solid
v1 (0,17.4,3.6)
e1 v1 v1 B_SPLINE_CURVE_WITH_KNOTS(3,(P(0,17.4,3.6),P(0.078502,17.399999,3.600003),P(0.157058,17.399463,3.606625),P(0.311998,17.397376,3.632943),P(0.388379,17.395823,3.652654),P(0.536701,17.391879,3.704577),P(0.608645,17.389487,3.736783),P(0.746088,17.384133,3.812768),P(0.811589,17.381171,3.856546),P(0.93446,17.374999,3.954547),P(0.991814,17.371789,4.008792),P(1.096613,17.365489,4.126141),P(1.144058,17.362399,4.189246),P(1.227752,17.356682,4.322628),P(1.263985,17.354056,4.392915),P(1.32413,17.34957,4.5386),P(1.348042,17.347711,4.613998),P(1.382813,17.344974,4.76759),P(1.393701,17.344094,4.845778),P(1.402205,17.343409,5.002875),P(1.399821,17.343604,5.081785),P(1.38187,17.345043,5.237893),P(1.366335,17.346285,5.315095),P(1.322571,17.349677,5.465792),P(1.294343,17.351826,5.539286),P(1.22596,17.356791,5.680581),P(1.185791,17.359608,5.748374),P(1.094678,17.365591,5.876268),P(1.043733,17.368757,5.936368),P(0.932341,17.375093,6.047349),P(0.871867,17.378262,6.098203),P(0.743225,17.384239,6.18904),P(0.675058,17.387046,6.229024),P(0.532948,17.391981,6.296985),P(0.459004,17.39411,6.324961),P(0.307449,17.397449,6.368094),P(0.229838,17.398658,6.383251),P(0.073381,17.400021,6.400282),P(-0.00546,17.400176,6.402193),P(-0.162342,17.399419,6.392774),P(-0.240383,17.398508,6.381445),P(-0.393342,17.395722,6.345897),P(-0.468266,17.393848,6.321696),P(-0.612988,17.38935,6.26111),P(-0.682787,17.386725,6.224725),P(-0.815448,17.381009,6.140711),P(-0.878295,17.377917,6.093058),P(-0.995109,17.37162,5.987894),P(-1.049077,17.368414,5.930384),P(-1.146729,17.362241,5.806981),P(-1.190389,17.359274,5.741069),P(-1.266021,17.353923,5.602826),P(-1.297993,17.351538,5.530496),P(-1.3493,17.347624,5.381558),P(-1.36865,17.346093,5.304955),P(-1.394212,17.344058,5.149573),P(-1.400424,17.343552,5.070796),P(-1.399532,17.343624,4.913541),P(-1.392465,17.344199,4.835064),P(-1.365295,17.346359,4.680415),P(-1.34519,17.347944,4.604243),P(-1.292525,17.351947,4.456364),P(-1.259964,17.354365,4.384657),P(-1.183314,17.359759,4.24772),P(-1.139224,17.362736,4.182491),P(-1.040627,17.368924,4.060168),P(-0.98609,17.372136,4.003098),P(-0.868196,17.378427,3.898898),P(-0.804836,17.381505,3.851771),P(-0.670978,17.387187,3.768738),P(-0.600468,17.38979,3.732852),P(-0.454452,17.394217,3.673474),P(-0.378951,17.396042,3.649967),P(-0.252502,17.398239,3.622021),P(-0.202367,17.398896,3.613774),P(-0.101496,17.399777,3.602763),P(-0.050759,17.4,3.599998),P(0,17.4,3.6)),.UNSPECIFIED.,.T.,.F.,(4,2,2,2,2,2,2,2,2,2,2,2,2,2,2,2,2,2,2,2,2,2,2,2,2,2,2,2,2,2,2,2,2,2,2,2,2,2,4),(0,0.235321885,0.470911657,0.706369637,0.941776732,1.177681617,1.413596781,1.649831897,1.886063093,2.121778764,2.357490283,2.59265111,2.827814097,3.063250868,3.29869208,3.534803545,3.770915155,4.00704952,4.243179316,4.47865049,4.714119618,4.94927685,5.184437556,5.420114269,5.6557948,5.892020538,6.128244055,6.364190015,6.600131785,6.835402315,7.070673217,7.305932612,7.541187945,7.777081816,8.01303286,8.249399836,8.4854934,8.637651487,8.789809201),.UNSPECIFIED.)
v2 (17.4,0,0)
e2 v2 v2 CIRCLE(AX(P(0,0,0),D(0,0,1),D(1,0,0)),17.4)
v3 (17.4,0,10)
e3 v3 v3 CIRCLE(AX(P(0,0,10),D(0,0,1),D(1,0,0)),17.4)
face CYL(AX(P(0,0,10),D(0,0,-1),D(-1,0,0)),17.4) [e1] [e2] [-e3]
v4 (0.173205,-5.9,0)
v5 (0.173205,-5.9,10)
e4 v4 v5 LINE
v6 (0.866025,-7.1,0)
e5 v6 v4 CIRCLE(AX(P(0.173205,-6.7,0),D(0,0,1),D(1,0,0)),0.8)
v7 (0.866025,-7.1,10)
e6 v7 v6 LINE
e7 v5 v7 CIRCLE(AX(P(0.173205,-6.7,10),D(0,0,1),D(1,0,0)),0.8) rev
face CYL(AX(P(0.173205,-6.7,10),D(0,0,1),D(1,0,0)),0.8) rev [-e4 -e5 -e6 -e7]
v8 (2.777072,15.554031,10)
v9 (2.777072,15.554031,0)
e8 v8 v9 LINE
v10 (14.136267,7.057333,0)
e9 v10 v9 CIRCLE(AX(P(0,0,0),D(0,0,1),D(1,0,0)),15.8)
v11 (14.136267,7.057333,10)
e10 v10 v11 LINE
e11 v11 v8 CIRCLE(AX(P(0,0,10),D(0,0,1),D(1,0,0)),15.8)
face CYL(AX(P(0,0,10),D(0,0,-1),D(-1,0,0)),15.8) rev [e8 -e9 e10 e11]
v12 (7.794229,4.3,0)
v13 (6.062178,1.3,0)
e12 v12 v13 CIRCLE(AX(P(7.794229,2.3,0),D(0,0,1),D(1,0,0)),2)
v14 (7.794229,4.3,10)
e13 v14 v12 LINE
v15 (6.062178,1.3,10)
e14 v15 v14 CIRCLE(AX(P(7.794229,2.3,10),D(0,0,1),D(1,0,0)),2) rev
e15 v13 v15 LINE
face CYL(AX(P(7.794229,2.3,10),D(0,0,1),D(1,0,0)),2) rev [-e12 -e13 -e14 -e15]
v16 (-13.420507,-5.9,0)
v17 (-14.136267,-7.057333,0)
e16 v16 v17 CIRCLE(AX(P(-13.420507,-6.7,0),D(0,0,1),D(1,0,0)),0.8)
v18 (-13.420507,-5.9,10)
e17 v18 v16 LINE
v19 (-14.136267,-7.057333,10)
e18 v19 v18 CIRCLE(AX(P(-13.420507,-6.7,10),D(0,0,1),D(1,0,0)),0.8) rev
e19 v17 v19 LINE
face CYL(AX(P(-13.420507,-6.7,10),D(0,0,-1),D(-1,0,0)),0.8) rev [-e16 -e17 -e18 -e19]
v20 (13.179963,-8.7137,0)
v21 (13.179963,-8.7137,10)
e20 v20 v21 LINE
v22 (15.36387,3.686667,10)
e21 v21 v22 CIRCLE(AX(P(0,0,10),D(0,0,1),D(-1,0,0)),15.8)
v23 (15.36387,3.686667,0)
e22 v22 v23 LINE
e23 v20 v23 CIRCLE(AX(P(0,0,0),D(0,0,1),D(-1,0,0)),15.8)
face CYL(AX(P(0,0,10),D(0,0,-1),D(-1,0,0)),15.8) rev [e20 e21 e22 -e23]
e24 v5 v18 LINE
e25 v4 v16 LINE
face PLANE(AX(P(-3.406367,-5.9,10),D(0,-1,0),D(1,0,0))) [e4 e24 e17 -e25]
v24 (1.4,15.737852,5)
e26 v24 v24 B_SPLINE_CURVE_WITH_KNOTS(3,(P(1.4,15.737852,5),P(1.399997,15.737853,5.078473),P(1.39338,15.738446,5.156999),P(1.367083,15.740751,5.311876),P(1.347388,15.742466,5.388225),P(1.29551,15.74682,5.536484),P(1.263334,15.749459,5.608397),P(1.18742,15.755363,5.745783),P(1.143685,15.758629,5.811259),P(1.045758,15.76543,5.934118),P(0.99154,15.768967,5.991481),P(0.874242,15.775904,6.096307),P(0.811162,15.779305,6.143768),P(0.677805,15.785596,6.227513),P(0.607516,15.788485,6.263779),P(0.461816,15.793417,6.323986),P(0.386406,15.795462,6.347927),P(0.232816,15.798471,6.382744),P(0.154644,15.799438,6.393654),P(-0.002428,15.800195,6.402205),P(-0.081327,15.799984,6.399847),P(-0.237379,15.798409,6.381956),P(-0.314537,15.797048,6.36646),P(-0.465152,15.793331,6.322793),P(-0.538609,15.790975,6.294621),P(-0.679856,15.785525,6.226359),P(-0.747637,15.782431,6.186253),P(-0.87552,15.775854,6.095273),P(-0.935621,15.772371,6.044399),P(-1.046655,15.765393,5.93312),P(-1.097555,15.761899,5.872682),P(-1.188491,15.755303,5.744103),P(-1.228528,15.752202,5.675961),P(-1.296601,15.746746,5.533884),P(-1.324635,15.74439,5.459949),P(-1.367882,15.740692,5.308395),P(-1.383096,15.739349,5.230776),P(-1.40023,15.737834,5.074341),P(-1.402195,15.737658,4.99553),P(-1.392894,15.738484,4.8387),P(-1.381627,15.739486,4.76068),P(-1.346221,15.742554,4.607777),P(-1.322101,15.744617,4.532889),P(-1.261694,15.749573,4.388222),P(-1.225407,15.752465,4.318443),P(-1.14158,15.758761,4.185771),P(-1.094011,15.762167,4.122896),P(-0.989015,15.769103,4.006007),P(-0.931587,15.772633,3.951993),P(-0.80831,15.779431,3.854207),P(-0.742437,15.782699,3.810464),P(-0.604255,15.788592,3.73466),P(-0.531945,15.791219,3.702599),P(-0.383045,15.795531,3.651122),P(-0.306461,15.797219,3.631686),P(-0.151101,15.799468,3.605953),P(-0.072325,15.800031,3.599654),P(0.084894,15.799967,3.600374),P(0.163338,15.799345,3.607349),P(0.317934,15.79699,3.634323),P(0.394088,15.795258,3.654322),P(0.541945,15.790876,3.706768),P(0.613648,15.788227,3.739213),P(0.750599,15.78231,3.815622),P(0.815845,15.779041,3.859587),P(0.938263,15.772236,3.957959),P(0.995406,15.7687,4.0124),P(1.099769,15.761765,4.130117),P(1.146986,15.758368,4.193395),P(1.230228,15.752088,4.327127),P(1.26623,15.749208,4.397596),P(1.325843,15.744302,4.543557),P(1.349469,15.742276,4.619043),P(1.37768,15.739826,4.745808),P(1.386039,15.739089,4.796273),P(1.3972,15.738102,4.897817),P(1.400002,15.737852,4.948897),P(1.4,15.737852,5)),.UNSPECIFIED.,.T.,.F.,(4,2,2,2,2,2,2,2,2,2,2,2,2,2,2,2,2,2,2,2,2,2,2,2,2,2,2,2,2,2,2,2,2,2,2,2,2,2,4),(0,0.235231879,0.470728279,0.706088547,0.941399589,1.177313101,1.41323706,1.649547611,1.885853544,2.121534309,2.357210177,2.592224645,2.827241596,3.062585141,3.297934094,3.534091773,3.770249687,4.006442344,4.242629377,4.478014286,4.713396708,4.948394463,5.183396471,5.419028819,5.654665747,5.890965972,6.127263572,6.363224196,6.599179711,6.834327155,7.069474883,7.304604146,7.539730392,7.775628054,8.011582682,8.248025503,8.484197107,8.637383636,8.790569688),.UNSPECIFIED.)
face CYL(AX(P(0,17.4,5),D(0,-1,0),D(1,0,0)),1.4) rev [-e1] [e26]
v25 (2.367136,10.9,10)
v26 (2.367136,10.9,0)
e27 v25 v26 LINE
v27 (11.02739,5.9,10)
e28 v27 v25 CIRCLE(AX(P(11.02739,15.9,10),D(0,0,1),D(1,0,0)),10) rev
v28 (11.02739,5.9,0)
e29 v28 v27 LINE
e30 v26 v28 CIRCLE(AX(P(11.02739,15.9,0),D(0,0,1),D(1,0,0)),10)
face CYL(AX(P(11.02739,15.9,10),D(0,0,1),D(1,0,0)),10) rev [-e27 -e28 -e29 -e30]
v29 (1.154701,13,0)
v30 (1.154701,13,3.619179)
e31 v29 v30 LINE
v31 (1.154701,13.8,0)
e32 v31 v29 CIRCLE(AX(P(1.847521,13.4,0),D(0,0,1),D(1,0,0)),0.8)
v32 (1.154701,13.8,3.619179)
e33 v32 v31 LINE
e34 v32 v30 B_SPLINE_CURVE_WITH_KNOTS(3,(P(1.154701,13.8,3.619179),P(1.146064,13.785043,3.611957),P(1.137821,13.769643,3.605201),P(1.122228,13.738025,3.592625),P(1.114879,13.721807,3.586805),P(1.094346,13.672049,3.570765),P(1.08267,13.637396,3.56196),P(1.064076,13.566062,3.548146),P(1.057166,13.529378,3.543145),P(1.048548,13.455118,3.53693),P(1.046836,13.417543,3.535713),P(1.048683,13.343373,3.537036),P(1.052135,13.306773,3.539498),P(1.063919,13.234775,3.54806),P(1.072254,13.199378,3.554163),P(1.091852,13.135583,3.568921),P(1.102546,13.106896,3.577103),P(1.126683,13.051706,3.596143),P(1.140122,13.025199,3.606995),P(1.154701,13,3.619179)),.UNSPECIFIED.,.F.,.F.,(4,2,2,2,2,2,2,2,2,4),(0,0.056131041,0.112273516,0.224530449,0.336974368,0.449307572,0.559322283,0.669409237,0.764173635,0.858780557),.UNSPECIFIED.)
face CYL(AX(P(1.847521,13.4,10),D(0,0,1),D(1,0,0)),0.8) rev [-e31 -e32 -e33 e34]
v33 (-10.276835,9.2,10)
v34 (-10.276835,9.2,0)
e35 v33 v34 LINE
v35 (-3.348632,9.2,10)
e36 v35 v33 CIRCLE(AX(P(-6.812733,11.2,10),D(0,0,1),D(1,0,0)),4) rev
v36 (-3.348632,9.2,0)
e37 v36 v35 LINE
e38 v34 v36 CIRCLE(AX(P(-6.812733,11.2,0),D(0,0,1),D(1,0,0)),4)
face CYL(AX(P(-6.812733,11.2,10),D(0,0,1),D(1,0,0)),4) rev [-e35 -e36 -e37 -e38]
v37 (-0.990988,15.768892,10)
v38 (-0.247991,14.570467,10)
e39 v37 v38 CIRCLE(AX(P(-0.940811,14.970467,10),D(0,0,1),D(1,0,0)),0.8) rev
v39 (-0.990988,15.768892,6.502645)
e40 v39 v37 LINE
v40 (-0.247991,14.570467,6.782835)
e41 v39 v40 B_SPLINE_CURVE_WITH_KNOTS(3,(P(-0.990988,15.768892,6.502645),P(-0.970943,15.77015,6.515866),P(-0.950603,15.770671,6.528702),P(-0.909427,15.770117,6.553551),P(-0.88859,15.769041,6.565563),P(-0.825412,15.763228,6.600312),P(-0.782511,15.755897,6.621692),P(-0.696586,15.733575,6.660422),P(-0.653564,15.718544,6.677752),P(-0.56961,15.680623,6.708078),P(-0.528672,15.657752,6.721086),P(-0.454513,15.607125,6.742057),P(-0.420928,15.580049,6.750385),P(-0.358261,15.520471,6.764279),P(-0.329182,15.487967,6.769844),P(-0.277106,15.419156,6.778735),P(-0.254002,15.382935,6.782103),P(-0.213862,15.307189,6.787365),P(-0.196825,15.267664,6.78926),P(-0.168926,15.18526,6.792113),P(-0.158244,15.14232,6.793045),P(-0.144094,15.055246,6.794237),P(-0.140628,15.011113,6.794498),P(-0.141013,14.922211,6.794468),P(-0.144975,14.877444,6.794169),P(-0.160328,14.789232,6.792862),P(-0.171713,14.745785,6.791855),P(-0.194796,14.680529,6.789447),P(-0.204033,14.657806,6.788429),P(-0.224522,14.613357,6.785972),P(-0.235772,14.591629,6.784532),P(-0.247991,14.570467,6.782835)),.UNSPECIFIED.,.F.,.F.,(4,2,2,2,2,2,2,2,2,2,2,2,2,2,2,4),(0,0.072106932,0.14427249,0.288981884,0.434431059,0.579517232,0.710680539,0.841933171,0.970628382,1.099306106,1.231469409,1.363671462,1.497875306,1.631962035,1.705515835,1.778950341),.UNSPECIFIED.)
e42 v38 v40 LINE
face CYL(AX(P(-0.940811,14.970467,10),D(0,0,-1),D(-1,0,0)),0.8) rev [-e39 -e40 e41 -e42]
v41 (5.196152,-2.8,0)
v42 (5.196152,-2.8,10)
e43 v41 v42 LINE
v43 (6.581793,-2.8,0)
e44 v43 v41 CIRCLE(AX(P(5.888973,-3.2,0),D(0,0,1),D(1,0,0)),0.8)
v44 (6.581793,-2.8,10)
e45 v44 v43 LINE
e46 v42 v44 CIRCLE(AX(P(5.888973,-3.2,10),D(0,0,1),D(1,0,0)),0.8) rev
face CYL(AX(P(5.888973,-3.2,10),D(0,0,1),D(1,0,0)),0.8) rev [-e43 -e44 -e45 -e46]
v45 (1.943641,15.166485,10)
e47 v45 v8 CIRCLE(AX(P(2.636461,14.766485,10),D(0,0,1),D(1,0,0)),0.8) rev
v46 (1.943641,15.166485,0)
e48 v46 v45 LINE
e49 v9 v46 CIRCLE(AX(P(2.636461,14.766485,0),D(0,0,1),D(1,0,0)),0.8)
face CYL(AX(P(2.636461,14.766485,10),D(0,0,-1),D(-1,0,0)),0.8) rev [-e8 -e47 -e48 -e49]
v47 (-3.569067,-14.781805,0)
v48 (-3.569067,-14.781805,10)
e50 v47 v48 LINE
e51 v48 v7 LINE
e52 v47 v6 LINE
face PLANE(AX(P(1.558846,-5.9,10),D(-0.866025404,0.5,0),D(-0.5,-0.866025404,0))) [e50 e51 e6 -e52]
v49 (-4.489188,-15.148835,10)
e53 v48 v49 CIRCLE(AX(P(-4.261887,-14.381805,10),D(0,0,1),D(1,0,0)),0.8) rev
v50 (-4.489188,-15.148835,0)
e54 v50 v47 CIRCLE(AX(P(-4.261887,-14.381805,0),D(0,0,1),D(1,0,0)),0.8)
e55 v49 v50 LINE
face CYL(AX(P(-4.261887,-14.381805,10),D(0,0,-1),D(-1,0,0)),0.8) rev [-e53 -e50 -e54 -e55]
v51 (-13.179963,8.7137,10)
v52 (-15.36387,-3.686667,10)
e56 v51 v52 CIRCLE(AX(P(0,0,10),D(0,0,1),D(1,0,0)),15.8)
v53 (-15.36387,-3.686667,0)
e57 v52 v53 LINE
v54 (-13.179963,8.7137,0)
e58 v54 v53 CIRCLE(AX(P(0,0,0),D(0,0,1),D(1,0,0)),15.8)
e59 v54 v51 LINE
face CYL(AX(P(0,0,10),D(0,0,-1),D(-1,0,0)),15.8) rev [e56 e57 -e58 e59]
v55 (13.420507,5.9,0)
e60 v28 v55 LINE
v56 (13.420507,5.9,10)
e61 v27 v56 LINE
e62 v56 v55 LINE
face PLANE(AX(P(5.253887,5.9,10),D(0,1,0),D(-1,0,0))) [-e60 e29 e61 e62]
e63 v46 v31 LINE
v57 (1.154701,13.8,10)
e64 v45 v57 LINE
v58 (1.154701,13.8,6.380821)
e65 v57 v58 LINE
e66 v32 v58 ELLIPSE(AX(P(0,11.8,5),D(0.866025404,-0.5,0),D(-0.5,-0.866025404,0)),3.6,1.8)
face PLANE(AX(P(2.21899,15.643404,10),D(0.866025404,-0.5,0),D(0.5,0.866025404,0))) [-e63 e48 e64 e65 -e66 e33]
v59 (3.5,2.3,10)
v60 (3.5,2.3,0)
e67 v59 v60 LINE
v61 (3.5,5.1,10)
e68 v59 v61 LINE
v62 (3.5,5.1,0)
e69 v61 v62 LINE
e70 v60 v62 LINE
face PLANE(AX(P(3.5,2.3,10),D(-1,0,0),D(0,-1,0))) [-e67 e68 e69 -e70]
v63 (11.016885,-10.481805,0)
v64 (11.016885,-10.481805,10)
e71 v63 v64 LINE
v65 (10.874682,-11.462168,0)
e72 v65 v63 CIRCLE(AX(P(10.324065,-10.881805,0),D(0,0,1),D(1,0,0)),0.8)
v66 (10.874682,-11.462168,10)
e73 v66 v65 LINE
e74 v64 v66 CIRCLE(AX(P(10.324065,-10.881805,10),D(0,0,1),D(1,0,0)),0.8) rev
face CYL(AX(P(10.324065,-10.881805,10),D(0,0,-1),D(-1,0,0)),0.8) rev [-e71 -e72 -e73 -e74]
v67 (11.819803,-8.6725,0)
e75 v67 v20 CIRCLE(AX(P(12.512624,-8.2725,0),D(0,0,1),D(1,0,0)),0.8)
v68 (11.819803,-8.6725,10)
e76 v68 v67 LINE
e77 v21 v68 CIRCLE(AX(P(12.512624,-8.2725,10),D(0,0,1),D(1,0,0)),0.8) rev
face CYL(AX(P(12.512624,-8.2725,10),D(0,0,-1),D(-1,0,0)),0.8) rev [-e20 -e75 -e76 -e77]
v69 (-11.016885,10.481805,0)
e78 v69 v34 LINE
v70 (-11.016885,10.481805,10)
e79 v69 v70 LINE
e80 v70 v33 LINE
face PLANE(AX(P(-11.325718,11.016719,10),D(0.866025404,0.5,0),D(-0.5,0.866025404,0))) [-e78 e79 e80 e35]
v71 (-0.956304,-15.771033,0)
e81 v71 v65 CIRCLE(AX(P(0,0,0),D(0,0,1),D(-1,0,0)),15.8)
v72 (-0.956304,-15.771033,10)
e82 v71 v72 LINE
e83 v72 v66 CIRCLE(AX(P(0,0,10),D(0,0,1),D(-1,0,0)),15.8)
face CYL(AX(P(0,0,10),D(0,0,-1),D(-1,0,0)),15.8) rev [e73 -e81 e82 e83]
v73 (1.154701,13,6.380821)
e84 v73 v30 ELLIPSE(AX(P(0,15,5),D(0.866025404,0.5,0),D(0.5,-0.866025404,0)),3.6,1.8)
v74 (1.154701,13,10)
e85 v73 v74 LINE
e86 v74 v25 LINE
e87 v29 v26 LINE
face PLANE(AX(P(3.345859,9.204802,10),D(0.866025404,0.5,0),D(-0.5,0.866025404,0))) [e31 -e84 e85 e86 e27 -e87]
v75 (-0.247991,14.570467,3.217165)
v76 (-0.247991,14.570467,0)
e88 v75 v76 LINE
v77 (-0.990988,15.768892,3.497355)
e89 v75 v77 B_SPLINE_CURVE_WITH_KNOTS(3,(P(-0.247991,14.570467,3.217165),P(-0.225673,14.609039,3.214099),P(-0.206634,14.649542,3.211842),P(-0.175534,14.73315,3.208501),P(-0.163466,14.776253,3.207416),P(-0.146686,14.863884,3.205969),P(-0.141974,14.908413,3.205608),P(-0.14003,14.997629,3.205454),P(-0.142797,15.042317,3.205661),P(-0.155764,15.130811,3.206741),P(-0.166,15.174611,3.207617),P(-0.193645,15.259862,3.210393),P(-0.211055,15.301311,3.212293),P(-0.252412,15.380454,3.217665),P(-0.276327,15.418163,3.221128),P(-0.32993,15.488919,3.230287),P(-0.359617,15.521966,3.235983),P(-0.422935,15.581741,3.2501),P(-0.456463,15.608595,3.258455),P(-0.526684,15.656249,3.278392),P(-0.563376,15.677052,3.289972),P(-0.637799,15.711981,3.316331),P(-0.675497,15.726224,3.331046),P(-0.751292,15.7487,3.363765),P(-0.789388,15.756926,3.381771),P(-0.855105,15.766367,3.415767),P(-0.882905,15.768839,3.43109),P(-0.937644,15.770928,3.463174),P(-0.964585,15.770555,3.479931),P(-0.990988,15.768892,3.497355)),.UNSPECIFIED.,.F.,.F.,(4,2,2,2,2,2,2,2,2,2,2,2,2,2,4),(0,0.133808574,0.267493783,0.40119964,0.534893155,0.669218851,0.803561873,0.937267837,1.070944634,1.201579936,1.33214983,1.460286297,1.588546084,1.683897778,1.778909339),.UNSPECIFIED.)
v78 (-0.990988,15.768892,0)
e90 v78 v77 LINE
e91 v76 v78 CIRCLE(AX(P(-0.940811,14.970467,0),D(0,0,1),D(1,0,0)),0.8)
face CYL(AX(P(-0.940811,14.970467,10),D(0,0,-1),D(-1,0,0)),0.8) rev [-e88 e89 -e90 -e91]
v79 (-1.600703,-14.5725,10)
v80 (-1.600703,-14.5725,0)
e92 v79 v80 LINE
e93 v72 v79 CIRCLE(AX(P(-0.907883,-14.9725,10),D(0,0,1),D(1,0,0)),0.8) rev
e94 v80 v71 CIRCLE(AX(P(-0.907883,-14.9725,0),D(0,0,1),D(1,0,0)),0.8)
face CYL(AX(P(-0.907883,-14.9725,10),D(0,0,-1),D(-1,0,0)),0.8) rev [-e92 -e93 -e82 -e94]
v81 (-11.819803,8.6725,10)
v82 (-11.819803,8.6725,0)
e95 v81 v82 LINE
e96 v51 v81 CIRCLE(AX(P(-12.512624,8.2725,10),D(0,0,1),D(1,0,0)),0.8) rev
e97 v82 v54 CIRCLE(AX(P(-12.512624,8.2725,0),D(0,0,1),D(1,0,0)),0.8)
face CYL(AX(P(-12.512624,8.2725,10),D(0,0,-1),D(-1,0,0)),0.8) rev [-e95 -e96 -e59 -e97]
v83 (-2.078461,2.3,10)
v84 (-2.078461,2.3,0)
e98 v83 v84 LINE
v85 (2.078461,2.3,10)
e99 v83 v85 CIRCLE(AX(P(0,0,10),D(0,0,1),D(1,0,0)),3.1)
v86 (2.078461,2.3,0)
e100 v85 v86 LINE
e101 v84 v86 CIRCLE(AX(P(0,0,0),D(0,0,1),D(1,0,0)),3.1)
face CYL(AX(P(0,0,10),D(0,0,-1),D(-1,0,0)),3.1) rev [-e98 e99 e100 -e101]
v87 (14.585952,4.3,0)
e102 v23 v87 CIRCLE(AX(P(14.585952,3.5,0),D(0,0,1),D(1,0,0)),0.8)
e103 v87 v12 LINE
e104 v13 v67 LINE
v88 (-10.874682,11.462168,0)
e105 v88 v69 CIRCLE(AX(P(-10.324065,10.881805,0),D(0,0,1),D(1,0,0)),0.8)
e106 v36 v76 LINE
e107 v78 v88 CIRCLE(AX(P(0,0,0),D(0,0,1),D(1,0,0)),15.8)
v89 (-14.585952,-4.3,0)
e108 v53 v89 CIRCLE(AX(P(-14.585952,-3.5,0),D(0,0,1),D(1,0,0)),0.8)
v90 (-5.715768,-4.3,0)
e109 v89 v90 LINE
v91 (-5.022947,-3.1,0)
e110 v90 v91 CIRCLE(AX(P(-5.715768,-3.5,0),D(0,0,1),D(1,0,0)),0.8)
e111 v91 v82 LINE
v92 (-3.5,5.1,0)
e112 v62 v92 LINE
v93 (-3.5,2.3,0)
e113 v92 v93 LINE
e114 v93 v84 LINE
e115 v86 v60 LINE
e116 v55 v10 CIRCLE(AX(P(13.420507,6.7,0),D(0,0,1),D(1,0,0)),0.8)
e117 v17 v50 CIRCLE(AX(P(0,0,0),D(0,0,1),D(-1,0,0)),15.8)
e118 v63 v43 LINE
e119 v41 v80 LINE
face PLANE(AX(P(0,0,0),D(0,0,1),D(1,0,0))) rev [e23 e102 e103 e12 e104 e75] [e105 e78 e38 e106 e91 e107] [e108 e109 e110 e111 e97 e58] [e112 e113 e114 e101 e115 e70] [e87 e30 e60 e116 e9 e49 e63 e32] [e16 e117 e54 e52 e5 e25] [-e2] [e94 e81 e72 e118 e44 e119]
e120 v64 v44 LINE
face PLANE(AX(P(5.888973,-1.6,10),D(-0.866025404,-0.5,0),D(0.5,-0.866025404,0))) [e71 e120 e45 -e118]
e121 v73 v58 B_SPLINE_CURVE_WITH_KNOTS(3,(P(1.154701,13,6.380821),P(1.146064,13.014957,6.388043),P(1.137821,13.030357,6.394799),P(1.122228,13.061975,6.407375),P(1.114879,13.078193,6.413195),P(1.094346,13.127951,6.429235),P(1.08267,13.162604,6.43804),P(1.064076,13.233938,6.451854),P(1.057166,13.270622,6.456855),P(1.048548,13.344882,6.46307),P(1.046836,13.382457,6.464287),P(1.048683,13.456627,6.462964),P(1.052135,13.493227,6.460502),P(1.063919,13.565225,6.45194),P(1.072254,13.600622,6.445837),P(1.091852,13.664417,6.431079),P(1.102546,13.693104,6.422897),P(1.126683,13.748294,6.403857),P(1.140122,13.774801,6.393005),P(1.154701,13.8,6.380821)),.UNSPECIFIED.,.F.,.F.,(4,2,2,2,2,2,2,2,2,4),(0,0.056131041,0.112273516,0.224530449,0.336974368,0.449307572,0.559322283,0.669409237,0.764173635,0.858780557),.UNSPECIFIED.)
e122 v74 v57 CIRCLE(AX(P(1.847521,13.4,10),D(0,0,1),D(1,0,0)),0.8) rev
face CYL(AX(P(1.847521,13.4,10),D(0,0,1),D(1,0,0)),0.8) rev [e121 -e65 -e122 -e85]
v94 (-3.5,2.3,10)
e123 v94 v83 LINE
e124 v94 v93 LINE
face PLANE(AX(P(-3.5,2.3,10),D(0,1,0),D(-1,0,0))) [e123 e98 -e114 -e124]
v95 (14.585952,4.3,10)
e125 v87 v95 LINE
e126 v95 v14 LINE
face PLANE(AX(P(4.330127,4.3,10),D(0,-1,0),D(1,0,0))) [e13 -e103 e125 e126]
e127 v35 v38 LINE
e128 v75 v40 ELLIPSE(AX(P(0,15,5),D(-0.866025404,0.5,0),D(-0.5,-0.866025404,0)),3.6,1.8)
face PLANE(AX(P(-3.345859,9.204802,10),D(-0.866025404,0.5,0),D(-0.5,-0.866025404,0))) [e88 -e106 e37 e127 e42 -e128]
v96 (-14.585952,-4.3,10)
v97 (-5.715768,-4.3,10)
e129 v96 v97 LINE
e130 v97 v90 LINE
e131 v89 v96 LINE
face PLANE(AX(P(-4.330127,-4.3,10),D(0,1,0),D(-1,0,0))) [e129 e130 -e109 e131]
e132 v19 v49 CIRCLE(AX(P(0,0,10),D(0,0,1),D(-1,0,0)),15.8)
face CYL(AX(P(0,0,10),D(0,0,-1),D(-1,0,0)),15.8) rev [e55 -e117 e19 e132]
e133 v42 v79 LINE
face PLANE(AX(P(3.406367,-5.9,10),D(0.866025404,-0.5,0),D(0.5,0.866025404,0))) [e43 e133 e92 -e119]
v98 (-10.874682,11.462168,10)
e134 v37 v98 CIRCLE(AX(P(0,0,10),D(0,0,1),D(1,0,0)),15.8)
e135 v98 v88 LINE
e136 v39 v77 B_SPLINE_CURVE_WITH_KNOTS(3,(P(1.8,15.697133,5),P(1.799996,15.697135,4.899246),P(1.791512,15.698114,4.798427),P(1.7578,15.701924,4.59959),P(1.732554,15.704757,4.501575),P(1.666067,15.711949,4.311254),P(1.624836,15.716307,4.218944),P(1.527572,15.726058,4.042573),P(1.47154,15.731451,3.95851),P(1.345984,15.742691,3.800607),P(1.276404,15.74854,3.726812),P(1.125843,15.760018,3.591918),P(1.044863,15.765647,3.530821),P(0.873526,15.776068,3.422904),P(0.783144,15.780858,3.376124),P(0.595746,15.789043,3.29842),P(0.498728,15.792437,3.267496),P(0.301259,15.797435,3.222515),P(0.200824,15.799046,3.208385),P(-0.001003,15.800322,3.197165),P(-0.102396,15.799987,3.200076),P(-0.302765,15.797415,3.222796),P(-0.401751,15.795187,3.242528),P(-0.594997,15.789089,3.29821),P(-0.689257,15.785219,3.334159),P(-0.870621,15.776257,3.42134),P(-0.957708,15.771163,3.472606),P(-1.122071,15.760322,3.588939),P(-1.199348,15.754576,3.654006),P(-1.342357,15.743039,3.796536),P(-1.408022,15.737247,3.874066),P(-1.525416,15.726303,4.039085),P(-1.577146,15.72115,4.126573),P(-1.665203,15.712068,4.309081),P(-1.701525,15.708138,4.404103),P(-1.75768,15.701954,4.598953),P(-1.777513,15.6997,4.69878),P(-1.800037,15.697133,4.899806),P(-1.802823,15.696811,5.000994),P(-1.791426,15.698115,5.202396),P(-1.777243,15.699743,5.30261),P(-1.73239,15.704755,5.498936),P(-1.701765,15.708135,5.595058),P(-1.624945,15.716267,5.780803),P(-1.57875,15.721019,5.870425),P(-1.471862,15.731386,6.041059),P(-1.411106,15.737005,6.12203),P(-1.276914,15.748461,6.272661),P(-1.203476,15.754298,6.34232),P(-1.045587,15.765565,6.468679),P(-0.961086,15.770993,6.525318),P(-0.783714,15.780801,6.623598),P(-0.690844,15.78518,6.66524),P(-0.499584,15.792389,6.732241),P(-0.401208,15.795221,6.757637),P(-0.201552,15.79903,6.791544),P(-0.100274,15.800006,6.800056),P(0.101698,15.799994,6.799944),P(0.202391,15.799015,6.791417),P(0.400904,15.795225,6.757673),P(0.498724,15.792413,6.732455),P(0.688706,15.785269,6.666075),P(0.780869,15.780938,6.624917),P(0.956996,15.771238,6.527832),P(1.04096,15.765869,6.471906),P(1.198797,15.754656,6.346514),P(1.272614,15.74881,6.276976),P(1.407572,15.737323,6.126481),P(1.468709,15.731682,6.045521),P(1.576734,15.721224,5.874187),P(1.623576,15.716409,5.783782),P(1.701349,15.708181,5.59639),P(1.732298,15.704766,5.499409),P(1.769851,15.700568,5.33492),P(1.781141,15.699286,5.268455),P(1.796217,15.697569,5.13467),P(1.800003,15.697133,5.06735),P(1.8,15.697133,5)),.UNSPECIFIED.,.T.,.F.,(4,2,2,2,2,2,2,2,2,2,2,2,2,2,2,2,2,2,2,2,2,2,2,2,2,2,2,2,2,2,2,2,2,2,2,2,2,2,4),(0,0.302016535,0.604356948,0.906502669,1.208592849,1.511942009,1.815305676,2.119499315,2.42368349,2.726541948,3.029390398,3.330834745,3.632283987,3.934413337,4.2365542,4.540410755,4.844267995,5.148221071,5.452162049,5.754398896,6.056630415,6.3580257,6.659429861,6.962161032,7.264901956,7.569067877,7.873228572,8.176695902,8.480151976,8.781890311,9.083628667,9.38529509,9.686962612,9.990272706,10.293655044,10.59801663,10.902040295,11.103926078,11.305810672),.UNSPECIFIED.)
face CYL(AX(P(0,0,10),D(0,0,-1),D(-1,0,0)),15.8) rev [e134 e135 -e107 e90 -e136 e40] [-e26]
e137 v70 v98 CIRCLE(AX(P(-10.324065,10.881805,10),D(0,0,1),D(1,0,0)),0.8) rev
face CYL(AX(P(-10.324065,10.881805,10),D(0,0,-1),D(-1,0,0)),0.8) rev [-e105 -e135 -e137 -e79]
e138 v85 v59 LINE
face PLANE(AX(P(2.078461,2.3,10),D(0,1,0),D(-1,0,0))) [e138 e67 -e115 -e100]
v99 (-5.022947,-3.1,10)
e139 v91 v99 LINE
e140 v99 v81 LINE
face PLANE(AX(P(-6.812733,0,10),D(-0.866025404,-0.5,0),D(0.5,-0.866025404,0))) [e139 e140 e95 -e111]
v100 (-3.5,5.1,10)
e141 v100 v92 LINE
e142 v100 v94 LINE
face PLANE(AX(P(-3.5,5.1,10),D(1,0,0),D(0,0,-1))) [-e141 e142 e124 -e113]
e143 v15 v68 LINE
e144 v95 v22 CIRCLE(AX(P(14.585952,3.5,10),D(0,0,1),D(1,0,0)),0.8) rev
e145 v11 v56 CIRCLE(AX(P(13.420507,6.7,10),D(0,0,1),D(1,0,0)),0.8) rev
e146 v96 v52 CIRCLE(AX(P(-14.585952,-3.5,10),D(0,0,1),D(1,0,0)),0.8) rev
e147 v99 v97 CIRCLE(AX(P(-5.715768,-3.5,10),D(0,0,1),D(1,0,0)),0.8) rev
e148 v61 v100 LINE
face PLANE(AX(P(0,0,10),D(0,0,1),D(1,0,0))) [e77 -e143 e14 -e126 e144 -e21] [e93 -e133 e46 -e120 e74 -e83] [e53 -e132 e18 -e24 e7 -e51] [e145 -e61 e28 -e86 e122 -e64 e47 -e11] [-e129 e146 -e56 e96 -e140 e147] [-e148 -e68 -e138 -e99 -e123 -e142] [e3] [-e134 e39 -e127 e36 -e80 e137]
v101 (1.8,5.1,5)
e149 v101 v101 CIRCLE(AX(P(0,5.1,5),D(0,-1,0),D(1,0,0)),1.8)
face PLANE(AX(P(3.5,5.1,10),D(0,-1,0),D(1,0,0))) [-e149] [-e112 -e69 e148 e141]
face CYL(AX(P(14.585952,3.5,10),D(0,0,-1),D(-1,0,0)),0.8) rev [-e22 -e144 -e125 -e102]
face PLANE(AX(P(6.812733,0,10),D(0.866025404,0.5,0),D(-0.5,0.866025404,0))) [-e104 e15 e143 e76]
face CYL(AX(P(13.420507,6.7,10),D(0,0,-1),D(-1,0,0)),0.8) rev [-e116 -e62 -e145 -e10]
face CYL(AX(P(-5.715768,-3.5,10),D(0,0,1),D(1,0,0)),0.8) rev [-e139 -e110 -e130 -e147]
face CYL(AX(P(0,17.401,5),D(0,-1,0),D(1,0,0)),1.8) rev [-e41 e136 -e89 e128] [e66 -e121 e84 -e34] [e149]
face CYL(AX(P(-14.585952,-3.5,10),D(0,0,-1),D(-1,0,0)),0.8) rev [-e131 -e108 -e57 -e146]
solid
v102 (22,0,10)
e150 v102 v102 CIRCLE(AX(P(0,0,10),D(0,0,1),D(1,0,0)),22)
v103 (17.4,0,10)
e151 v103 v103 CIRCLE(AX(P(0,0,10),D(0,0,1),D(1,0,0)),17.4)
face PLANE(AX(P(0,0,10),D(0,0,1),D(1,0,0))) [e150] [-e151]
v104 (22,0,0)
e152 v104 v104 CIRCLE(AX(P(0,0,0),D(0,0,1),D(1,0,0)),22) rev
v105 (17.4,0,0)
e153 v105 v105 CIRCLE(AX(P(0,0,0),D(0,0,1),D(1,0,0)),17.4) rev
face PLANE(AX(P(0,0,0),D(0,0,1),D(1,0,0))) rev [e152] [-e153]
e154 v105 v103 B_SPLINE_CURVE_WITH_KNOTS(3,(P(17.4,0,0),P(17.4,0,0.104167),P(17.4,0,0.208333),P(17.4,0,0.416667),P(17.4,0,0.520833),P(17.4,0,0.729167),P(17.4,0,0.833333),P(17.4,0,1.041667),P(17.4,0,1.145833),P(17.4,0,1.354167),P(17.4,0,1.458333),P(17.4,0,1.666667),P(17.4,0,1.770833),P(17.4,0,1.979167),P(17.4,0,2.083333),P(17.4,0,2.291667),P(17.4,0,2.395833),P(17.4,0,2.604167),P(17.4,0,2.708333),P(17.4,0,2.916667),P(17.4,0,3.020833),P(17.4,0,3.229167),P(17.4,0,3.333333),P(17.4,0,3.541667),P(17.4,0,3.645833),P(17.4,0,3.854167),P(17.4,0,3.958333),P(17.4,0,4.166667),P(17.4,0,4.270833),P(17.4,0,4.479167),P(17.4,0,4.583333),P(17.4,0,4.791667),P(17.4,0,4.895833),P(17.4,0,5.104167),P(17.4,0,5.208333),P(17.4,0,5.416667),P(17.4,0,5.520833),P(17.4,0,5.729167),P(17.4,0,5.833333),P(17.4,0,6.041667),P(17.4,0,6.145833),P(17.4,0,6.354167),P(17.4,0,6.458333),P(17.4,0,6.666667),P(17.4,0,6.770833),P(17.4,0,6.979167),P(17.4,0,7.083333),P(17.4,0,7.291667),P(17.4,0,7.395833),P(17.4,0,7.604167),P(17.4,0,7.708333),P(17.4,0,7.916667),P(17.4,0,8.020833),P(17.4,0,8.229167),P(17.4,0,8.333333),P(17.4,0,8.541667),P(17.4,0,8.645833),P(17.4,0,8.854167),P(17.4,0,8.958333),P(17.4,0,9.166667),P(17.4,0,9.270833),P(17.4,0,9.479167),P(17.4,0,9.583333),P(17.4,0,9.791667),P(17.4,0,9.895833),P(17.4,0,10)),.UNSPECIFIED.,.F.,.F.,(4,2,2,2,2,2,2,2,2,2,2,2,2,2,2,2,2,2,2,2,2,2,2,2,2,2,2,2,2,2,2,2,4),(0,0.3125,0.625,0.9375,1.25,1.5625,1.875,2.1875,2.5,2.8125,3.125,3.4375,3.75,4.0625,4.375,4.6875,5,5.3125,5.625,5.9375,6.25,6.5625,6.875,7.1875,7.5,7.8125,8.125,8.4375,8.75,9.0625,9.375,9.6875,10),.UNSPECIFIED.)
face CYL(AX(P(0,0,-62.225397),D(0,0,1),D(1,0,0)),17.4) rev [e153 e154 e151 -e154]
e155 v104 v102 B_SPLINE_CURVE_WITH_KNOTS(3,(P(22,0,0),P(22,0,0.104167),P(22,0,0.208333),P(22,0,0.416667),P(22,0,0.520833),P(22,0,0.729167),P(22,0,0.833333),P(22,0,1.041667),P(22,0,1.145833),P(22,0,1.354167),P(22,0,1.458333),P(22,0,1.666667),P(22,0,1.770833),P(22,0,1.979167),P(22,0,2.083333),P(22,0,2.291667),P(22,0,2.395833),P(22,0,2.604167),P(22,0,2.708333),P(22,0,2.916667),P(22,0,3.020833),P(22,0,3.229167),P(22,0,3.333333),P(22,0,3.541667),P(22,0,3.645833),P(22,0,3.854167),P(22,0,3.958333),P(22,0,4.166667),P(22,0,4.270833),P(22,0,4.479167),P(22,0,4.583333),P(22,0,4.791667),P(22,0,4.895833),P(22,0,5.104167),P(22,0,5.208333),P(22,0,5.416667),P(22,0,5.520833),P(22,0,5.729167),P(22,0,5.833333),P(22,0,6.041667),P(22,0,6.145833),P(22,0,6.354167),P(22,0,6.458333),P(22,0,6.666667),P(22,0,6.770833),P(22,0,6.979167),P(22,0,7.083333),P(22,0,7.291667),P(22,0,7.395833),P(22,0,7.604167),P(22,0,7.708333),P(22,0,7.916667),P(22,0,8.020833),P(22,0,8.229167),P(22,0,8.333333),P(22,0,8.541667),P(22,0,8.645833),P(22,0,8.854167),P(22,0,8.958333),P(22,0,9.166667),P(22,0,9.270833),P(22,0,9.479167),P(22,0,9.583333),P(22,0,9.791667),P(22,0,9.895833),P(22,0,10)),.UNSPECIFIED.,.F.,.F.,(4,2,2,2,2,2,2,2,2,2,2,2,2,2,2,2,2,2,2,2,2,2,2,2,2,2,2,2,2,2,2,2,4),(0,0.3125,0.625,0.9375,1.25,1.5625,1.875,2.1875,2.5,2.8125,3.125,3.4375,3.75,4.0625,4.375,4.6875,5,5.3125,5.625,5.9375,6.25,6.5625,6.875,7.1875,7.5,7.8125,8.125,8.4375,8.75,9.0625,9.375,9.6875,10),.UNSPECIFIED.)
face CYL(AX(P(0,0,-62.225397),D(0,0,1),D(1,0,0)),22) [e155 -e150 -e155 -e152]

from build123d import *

# Parameters (mm, degrees)
SKETCH1_R              = 17.4
BOSS_EXTRUDE1_DEPTH    = 10
BOSS_EXTRUDE3_DEPTH    = 10
FILLET1_R              = 0.8
FILLET2_R              = 0.8
FILLET3_R              = 0.8
CUT_EXTRUDE1_START     = -10.700000099
CUT_EXTRUDE1_OUTLINE_R = 1.8
CUT_EXTRUDE1_DEPTH     = 10.700000099
CUT_EXTRUDE1_START_2   = -1e-07
CUT_EXTRUDE1_2_DEPTH   = 10.0000002
SKETCH6_R              = 1.4
CUT_EXTRUDE3_DEPTH     = 31.149792736
SKETCH11_R             = 22
SKETCH11_R_2           = 17.4
BOSS_EXTRUDE7_DEPTH    = 10
FILLET4_R              = 10
FILLET5_R              = 4
FILLET6_R              = 2


with BuildPart() as part:
    # Sketch1 → Boss-Extrude1 (new body)
    with BuildSketch(Plane.XY):
        Circle(SKETCH1_R)
        with BuildLine():
            Line((2.078460969, 2.3), (3.5, 2.3))
            Line((3.5, 2.3), (3.5, 5.1))
            Line((3.5, 5.1), (-3.5, 5.1))
            Line((-3.5, 5.1), (-3.5, 2.3))
            Line((-3.5, 2.3), (-2.078460969, 2.3))
            ThreePointArc((-2.078460969, 2.3), (0, -3.1), (2.078460969, 2.3))
        make_face(mode=Mode.SUBTRACT)
        with BuildLine():
            Line((-6.812733176, 0), (-12.438089983, 9.743403799))
            ThreePointArc((-12.438089983, 9.743403799), (-15.502267656, 3.052817964), (-15.20361799, -4.3))
            Line((-15.20361799, -4.3), (-4.330127019, -4.3))
            Line((-4.330127019, -4.3), (-6.812733176, 0))
        make_face(mode=Mode.SUBTRACT)
        with BuildLine():
            Line((-3.406366588, -5.9), (-14.6570802, -5.9))
            ThreePointArc((-14.6570802, -5.9), (-10.394951738, -11.898948625), (-3.877899759, -15.316719409))
            Line((-3.877899759, -15.316719409), (1.558845727, -5.9))
            Line((1.558845727, -5.9), (-3.406366588, -5.9))
        make_face(mode=Mode.SUBTRACT)
        with BuildLine():
            Line((3.406366588, -5.9), (-2.218990218, -15.643403799))
            ThreePointArc((-2.218990218, -15.643403799), (5.107315918, -14.951766588), (11.325718232, -11.016719409))
            Line((11.325718232, -11.016719409), (5.888972746, -1.6))
            Line((5.888972746, -1.6), (3.406366588, -5.9))
        make_face(mode=Mode.SUBTRACT)
        with BuildLine():
            Line((6.812733176, 0), (12.438089983, -9.743403799))
            ThreePointArc((12.438089983, -9.743403799), (15.502267656, -3.052817964), (15.20361799, 4.3))
            Line((15.20361799, 4.3), (4.330127019, 4.3))
            Line((4.330127019, 4.3), (6.812733176, 0))
        make_face(mode=Mode.SUBTRACT)
        with BuildLine():
            Line((-11.325718232, 11.016719409), (-6.812733176, 3.2))
            Line((-6.812733176, 3.2), (-3.345858956, 9.204802293))
            Line((-3.345858956, 9.204802293), (0.458046128, 15.793359166))
            ThreePointArc((0.458046128, 15.793359166), (-5.935540926, 14.642723583), (-11.325718232, 11.016719409))
        make_face(mode=Mode.SUBTRACT)
        with BuildLine():
            Line((3.345858956, 9.204802293), (5.25388745, 5.9))
            Line((5.25388745, 5.9), (14.6570802, 5.9))
            ThreePointArc((14.6570802, 5.9), (9.743403799, 12.438089983), (2.218990218, 15.643403799))
            Line((2.218990218, 15.643403799), (-1.498338095, 9.204802293))
            Line((-1.498338095, 9.204802293), (3.345858956, 9.204802293))
        make_face(mode=Mode.SUBTRACT)
    extrude(amount=BOSS_EXTRUDE1_DEPTH)

    # Sketch9 → Boss-Extrude3 (add)
    with BuildSketch(Plane(origin=(0, 0, 0), x_dir=(-1, 0, 0), z_dir=(0, 0, -1))):
        Polygon((-3.345858956, 9.204802293), (-0.923760431, 13.4), (1.498338095, 9.204802293), align=None)
    extrude(amount=-BOSS_EXTRUDE3_DEPTH)

    # Fillet1
    fillet1_edges = [part.edges().sort_by_distance(p)[0] for p in [
        (0.923760431, 13.4, 5),
        (5.888972746, -1.6, 5),
        (-4.330127019, -4.3, 5),
        (1.558845727, -5.9, 5),
    ]]
    fillet(fillet1_edges, radius=FILLET1_R)

    # Fillet2
    fillet2_edges = [part.edges().sort_by_distance(p)[0] for p in [
        (-2.218990218, -15.643403799, 5),
        (12.438089983, -9.743403799, 5),
        (-12.438089983, 9.743403799, 5),
        (-14.6570802, -5.9, 5),
        (0.458046128, 15.793359166, 5),
        (14.6570802, 5.9, 5),
    ]]
    fillet(fillet2_edges, radius=FILLET2_R)

    # Fillet3
    fillet3_edges = [part.edges().sort_by_distance(p)[0] for p in [
        (11.325718232, -11.016719409, 5),
        (15.20361799, 4.3, 5),
        (-15.20361799, -4.3, 5),
        (-3.877899759, -15.316719409, 5),
        (-11.325718232, 11.016719409, 5),
        (2.218990218, 15.643403799, 5),
    ]]
    fillet(fillet3_edges, radius=FILLET3_R)

    # Cut-Extrude1: read off the stored shape, not the designer's step
    # Cut-Extrude1 outline → Cut-Extrude1 (cut)
    with BuildSketch(Plane.XZ.offset(-5.1).offset(CUT_EXTRUDE1_START)):
        with Locations((0, 5)):
            Circle(CUT_EXTRUDE1_OUTLINE_R)
    extrude(amount=CUT_EXTRUDE1_DEPTH, mode=Mode.SUBTRACT)

    # Cut-Extrude1 2 outline → Cut-Extrude1 2 (add)
    with BuildSketch(Plane.XY.offset(CUT_EXTRUDE1_START_2)):
        with BuildLine():
            Line((-3, 15.800000099), (-3, 15.512575543))
            ThreePointArc((-3, 15.512575543), (-1.506868675, 15.727979743), (0, 15.8))
            Line((0, 15.8), (-3, 15.800000099))
        make_face()
        with BuildLine():
            Line((3, 15.800000099), (0, 15.8))
            ThreePointArc((0, 15.8), (0.901468663, 15.774262399), (1.80000041, 15.697133449))
            Line((1.80000041, 15.697133449), (3, 15.559528723))
            Line((3, 15.559528723), (3, 15.800000099))
        make_face()
    extrude(amount=CUT_EXTRUDE1_2_DEPTH)

    # Sketch6 → Cut-Extrude3 (cut, through all)
    with BuildSketch(Plane.XZ.offset(-5.1)):
        with Locations((0, 5)):
            Circle(SKETCH6_R)
    extrude(amount=-CUT_EXTRUDE3_DEPTH, mode=Mode.SUBTRACT)

    # Fillet4
    fillet4_edges = [part.edges().sort_by_distance(p)[0] for p in [
        (5.25388745, 5.9, 5),
    ]]
    fillet(fillet4_edges, radius=FILLET4_R)

    # Fillet5
    fillet5_edges = [part.edges().sort_by_distance(p)[0] for p in [
        (-6.812733176, 3.2, 5),
    ]]
    fillet(fillet5_edges, radius=FILLET5_R)

    # Fillet6
    fillet6_edges = [part.edges().sort_by_distance(p)[0] for p in [
        (4.330127019, 4.3, 5),
    ]]
    fillet(fillet6_edges, radius=FILLET6_R)


with BuildPart() as body_2:
    # Sketch11 → Boss-Extrude7 (new body)
    with BuildSketch(Plane.XY.offset(10)):
        Circle(SKETCH11_R)
        Circle(SKETCH11_R_2, mode=Mode.SUBTRACT)
    extrude(amount=-BOSS_EXTRUDE7_DEPTH)


solid = Compound([part.part, body_2.part])
